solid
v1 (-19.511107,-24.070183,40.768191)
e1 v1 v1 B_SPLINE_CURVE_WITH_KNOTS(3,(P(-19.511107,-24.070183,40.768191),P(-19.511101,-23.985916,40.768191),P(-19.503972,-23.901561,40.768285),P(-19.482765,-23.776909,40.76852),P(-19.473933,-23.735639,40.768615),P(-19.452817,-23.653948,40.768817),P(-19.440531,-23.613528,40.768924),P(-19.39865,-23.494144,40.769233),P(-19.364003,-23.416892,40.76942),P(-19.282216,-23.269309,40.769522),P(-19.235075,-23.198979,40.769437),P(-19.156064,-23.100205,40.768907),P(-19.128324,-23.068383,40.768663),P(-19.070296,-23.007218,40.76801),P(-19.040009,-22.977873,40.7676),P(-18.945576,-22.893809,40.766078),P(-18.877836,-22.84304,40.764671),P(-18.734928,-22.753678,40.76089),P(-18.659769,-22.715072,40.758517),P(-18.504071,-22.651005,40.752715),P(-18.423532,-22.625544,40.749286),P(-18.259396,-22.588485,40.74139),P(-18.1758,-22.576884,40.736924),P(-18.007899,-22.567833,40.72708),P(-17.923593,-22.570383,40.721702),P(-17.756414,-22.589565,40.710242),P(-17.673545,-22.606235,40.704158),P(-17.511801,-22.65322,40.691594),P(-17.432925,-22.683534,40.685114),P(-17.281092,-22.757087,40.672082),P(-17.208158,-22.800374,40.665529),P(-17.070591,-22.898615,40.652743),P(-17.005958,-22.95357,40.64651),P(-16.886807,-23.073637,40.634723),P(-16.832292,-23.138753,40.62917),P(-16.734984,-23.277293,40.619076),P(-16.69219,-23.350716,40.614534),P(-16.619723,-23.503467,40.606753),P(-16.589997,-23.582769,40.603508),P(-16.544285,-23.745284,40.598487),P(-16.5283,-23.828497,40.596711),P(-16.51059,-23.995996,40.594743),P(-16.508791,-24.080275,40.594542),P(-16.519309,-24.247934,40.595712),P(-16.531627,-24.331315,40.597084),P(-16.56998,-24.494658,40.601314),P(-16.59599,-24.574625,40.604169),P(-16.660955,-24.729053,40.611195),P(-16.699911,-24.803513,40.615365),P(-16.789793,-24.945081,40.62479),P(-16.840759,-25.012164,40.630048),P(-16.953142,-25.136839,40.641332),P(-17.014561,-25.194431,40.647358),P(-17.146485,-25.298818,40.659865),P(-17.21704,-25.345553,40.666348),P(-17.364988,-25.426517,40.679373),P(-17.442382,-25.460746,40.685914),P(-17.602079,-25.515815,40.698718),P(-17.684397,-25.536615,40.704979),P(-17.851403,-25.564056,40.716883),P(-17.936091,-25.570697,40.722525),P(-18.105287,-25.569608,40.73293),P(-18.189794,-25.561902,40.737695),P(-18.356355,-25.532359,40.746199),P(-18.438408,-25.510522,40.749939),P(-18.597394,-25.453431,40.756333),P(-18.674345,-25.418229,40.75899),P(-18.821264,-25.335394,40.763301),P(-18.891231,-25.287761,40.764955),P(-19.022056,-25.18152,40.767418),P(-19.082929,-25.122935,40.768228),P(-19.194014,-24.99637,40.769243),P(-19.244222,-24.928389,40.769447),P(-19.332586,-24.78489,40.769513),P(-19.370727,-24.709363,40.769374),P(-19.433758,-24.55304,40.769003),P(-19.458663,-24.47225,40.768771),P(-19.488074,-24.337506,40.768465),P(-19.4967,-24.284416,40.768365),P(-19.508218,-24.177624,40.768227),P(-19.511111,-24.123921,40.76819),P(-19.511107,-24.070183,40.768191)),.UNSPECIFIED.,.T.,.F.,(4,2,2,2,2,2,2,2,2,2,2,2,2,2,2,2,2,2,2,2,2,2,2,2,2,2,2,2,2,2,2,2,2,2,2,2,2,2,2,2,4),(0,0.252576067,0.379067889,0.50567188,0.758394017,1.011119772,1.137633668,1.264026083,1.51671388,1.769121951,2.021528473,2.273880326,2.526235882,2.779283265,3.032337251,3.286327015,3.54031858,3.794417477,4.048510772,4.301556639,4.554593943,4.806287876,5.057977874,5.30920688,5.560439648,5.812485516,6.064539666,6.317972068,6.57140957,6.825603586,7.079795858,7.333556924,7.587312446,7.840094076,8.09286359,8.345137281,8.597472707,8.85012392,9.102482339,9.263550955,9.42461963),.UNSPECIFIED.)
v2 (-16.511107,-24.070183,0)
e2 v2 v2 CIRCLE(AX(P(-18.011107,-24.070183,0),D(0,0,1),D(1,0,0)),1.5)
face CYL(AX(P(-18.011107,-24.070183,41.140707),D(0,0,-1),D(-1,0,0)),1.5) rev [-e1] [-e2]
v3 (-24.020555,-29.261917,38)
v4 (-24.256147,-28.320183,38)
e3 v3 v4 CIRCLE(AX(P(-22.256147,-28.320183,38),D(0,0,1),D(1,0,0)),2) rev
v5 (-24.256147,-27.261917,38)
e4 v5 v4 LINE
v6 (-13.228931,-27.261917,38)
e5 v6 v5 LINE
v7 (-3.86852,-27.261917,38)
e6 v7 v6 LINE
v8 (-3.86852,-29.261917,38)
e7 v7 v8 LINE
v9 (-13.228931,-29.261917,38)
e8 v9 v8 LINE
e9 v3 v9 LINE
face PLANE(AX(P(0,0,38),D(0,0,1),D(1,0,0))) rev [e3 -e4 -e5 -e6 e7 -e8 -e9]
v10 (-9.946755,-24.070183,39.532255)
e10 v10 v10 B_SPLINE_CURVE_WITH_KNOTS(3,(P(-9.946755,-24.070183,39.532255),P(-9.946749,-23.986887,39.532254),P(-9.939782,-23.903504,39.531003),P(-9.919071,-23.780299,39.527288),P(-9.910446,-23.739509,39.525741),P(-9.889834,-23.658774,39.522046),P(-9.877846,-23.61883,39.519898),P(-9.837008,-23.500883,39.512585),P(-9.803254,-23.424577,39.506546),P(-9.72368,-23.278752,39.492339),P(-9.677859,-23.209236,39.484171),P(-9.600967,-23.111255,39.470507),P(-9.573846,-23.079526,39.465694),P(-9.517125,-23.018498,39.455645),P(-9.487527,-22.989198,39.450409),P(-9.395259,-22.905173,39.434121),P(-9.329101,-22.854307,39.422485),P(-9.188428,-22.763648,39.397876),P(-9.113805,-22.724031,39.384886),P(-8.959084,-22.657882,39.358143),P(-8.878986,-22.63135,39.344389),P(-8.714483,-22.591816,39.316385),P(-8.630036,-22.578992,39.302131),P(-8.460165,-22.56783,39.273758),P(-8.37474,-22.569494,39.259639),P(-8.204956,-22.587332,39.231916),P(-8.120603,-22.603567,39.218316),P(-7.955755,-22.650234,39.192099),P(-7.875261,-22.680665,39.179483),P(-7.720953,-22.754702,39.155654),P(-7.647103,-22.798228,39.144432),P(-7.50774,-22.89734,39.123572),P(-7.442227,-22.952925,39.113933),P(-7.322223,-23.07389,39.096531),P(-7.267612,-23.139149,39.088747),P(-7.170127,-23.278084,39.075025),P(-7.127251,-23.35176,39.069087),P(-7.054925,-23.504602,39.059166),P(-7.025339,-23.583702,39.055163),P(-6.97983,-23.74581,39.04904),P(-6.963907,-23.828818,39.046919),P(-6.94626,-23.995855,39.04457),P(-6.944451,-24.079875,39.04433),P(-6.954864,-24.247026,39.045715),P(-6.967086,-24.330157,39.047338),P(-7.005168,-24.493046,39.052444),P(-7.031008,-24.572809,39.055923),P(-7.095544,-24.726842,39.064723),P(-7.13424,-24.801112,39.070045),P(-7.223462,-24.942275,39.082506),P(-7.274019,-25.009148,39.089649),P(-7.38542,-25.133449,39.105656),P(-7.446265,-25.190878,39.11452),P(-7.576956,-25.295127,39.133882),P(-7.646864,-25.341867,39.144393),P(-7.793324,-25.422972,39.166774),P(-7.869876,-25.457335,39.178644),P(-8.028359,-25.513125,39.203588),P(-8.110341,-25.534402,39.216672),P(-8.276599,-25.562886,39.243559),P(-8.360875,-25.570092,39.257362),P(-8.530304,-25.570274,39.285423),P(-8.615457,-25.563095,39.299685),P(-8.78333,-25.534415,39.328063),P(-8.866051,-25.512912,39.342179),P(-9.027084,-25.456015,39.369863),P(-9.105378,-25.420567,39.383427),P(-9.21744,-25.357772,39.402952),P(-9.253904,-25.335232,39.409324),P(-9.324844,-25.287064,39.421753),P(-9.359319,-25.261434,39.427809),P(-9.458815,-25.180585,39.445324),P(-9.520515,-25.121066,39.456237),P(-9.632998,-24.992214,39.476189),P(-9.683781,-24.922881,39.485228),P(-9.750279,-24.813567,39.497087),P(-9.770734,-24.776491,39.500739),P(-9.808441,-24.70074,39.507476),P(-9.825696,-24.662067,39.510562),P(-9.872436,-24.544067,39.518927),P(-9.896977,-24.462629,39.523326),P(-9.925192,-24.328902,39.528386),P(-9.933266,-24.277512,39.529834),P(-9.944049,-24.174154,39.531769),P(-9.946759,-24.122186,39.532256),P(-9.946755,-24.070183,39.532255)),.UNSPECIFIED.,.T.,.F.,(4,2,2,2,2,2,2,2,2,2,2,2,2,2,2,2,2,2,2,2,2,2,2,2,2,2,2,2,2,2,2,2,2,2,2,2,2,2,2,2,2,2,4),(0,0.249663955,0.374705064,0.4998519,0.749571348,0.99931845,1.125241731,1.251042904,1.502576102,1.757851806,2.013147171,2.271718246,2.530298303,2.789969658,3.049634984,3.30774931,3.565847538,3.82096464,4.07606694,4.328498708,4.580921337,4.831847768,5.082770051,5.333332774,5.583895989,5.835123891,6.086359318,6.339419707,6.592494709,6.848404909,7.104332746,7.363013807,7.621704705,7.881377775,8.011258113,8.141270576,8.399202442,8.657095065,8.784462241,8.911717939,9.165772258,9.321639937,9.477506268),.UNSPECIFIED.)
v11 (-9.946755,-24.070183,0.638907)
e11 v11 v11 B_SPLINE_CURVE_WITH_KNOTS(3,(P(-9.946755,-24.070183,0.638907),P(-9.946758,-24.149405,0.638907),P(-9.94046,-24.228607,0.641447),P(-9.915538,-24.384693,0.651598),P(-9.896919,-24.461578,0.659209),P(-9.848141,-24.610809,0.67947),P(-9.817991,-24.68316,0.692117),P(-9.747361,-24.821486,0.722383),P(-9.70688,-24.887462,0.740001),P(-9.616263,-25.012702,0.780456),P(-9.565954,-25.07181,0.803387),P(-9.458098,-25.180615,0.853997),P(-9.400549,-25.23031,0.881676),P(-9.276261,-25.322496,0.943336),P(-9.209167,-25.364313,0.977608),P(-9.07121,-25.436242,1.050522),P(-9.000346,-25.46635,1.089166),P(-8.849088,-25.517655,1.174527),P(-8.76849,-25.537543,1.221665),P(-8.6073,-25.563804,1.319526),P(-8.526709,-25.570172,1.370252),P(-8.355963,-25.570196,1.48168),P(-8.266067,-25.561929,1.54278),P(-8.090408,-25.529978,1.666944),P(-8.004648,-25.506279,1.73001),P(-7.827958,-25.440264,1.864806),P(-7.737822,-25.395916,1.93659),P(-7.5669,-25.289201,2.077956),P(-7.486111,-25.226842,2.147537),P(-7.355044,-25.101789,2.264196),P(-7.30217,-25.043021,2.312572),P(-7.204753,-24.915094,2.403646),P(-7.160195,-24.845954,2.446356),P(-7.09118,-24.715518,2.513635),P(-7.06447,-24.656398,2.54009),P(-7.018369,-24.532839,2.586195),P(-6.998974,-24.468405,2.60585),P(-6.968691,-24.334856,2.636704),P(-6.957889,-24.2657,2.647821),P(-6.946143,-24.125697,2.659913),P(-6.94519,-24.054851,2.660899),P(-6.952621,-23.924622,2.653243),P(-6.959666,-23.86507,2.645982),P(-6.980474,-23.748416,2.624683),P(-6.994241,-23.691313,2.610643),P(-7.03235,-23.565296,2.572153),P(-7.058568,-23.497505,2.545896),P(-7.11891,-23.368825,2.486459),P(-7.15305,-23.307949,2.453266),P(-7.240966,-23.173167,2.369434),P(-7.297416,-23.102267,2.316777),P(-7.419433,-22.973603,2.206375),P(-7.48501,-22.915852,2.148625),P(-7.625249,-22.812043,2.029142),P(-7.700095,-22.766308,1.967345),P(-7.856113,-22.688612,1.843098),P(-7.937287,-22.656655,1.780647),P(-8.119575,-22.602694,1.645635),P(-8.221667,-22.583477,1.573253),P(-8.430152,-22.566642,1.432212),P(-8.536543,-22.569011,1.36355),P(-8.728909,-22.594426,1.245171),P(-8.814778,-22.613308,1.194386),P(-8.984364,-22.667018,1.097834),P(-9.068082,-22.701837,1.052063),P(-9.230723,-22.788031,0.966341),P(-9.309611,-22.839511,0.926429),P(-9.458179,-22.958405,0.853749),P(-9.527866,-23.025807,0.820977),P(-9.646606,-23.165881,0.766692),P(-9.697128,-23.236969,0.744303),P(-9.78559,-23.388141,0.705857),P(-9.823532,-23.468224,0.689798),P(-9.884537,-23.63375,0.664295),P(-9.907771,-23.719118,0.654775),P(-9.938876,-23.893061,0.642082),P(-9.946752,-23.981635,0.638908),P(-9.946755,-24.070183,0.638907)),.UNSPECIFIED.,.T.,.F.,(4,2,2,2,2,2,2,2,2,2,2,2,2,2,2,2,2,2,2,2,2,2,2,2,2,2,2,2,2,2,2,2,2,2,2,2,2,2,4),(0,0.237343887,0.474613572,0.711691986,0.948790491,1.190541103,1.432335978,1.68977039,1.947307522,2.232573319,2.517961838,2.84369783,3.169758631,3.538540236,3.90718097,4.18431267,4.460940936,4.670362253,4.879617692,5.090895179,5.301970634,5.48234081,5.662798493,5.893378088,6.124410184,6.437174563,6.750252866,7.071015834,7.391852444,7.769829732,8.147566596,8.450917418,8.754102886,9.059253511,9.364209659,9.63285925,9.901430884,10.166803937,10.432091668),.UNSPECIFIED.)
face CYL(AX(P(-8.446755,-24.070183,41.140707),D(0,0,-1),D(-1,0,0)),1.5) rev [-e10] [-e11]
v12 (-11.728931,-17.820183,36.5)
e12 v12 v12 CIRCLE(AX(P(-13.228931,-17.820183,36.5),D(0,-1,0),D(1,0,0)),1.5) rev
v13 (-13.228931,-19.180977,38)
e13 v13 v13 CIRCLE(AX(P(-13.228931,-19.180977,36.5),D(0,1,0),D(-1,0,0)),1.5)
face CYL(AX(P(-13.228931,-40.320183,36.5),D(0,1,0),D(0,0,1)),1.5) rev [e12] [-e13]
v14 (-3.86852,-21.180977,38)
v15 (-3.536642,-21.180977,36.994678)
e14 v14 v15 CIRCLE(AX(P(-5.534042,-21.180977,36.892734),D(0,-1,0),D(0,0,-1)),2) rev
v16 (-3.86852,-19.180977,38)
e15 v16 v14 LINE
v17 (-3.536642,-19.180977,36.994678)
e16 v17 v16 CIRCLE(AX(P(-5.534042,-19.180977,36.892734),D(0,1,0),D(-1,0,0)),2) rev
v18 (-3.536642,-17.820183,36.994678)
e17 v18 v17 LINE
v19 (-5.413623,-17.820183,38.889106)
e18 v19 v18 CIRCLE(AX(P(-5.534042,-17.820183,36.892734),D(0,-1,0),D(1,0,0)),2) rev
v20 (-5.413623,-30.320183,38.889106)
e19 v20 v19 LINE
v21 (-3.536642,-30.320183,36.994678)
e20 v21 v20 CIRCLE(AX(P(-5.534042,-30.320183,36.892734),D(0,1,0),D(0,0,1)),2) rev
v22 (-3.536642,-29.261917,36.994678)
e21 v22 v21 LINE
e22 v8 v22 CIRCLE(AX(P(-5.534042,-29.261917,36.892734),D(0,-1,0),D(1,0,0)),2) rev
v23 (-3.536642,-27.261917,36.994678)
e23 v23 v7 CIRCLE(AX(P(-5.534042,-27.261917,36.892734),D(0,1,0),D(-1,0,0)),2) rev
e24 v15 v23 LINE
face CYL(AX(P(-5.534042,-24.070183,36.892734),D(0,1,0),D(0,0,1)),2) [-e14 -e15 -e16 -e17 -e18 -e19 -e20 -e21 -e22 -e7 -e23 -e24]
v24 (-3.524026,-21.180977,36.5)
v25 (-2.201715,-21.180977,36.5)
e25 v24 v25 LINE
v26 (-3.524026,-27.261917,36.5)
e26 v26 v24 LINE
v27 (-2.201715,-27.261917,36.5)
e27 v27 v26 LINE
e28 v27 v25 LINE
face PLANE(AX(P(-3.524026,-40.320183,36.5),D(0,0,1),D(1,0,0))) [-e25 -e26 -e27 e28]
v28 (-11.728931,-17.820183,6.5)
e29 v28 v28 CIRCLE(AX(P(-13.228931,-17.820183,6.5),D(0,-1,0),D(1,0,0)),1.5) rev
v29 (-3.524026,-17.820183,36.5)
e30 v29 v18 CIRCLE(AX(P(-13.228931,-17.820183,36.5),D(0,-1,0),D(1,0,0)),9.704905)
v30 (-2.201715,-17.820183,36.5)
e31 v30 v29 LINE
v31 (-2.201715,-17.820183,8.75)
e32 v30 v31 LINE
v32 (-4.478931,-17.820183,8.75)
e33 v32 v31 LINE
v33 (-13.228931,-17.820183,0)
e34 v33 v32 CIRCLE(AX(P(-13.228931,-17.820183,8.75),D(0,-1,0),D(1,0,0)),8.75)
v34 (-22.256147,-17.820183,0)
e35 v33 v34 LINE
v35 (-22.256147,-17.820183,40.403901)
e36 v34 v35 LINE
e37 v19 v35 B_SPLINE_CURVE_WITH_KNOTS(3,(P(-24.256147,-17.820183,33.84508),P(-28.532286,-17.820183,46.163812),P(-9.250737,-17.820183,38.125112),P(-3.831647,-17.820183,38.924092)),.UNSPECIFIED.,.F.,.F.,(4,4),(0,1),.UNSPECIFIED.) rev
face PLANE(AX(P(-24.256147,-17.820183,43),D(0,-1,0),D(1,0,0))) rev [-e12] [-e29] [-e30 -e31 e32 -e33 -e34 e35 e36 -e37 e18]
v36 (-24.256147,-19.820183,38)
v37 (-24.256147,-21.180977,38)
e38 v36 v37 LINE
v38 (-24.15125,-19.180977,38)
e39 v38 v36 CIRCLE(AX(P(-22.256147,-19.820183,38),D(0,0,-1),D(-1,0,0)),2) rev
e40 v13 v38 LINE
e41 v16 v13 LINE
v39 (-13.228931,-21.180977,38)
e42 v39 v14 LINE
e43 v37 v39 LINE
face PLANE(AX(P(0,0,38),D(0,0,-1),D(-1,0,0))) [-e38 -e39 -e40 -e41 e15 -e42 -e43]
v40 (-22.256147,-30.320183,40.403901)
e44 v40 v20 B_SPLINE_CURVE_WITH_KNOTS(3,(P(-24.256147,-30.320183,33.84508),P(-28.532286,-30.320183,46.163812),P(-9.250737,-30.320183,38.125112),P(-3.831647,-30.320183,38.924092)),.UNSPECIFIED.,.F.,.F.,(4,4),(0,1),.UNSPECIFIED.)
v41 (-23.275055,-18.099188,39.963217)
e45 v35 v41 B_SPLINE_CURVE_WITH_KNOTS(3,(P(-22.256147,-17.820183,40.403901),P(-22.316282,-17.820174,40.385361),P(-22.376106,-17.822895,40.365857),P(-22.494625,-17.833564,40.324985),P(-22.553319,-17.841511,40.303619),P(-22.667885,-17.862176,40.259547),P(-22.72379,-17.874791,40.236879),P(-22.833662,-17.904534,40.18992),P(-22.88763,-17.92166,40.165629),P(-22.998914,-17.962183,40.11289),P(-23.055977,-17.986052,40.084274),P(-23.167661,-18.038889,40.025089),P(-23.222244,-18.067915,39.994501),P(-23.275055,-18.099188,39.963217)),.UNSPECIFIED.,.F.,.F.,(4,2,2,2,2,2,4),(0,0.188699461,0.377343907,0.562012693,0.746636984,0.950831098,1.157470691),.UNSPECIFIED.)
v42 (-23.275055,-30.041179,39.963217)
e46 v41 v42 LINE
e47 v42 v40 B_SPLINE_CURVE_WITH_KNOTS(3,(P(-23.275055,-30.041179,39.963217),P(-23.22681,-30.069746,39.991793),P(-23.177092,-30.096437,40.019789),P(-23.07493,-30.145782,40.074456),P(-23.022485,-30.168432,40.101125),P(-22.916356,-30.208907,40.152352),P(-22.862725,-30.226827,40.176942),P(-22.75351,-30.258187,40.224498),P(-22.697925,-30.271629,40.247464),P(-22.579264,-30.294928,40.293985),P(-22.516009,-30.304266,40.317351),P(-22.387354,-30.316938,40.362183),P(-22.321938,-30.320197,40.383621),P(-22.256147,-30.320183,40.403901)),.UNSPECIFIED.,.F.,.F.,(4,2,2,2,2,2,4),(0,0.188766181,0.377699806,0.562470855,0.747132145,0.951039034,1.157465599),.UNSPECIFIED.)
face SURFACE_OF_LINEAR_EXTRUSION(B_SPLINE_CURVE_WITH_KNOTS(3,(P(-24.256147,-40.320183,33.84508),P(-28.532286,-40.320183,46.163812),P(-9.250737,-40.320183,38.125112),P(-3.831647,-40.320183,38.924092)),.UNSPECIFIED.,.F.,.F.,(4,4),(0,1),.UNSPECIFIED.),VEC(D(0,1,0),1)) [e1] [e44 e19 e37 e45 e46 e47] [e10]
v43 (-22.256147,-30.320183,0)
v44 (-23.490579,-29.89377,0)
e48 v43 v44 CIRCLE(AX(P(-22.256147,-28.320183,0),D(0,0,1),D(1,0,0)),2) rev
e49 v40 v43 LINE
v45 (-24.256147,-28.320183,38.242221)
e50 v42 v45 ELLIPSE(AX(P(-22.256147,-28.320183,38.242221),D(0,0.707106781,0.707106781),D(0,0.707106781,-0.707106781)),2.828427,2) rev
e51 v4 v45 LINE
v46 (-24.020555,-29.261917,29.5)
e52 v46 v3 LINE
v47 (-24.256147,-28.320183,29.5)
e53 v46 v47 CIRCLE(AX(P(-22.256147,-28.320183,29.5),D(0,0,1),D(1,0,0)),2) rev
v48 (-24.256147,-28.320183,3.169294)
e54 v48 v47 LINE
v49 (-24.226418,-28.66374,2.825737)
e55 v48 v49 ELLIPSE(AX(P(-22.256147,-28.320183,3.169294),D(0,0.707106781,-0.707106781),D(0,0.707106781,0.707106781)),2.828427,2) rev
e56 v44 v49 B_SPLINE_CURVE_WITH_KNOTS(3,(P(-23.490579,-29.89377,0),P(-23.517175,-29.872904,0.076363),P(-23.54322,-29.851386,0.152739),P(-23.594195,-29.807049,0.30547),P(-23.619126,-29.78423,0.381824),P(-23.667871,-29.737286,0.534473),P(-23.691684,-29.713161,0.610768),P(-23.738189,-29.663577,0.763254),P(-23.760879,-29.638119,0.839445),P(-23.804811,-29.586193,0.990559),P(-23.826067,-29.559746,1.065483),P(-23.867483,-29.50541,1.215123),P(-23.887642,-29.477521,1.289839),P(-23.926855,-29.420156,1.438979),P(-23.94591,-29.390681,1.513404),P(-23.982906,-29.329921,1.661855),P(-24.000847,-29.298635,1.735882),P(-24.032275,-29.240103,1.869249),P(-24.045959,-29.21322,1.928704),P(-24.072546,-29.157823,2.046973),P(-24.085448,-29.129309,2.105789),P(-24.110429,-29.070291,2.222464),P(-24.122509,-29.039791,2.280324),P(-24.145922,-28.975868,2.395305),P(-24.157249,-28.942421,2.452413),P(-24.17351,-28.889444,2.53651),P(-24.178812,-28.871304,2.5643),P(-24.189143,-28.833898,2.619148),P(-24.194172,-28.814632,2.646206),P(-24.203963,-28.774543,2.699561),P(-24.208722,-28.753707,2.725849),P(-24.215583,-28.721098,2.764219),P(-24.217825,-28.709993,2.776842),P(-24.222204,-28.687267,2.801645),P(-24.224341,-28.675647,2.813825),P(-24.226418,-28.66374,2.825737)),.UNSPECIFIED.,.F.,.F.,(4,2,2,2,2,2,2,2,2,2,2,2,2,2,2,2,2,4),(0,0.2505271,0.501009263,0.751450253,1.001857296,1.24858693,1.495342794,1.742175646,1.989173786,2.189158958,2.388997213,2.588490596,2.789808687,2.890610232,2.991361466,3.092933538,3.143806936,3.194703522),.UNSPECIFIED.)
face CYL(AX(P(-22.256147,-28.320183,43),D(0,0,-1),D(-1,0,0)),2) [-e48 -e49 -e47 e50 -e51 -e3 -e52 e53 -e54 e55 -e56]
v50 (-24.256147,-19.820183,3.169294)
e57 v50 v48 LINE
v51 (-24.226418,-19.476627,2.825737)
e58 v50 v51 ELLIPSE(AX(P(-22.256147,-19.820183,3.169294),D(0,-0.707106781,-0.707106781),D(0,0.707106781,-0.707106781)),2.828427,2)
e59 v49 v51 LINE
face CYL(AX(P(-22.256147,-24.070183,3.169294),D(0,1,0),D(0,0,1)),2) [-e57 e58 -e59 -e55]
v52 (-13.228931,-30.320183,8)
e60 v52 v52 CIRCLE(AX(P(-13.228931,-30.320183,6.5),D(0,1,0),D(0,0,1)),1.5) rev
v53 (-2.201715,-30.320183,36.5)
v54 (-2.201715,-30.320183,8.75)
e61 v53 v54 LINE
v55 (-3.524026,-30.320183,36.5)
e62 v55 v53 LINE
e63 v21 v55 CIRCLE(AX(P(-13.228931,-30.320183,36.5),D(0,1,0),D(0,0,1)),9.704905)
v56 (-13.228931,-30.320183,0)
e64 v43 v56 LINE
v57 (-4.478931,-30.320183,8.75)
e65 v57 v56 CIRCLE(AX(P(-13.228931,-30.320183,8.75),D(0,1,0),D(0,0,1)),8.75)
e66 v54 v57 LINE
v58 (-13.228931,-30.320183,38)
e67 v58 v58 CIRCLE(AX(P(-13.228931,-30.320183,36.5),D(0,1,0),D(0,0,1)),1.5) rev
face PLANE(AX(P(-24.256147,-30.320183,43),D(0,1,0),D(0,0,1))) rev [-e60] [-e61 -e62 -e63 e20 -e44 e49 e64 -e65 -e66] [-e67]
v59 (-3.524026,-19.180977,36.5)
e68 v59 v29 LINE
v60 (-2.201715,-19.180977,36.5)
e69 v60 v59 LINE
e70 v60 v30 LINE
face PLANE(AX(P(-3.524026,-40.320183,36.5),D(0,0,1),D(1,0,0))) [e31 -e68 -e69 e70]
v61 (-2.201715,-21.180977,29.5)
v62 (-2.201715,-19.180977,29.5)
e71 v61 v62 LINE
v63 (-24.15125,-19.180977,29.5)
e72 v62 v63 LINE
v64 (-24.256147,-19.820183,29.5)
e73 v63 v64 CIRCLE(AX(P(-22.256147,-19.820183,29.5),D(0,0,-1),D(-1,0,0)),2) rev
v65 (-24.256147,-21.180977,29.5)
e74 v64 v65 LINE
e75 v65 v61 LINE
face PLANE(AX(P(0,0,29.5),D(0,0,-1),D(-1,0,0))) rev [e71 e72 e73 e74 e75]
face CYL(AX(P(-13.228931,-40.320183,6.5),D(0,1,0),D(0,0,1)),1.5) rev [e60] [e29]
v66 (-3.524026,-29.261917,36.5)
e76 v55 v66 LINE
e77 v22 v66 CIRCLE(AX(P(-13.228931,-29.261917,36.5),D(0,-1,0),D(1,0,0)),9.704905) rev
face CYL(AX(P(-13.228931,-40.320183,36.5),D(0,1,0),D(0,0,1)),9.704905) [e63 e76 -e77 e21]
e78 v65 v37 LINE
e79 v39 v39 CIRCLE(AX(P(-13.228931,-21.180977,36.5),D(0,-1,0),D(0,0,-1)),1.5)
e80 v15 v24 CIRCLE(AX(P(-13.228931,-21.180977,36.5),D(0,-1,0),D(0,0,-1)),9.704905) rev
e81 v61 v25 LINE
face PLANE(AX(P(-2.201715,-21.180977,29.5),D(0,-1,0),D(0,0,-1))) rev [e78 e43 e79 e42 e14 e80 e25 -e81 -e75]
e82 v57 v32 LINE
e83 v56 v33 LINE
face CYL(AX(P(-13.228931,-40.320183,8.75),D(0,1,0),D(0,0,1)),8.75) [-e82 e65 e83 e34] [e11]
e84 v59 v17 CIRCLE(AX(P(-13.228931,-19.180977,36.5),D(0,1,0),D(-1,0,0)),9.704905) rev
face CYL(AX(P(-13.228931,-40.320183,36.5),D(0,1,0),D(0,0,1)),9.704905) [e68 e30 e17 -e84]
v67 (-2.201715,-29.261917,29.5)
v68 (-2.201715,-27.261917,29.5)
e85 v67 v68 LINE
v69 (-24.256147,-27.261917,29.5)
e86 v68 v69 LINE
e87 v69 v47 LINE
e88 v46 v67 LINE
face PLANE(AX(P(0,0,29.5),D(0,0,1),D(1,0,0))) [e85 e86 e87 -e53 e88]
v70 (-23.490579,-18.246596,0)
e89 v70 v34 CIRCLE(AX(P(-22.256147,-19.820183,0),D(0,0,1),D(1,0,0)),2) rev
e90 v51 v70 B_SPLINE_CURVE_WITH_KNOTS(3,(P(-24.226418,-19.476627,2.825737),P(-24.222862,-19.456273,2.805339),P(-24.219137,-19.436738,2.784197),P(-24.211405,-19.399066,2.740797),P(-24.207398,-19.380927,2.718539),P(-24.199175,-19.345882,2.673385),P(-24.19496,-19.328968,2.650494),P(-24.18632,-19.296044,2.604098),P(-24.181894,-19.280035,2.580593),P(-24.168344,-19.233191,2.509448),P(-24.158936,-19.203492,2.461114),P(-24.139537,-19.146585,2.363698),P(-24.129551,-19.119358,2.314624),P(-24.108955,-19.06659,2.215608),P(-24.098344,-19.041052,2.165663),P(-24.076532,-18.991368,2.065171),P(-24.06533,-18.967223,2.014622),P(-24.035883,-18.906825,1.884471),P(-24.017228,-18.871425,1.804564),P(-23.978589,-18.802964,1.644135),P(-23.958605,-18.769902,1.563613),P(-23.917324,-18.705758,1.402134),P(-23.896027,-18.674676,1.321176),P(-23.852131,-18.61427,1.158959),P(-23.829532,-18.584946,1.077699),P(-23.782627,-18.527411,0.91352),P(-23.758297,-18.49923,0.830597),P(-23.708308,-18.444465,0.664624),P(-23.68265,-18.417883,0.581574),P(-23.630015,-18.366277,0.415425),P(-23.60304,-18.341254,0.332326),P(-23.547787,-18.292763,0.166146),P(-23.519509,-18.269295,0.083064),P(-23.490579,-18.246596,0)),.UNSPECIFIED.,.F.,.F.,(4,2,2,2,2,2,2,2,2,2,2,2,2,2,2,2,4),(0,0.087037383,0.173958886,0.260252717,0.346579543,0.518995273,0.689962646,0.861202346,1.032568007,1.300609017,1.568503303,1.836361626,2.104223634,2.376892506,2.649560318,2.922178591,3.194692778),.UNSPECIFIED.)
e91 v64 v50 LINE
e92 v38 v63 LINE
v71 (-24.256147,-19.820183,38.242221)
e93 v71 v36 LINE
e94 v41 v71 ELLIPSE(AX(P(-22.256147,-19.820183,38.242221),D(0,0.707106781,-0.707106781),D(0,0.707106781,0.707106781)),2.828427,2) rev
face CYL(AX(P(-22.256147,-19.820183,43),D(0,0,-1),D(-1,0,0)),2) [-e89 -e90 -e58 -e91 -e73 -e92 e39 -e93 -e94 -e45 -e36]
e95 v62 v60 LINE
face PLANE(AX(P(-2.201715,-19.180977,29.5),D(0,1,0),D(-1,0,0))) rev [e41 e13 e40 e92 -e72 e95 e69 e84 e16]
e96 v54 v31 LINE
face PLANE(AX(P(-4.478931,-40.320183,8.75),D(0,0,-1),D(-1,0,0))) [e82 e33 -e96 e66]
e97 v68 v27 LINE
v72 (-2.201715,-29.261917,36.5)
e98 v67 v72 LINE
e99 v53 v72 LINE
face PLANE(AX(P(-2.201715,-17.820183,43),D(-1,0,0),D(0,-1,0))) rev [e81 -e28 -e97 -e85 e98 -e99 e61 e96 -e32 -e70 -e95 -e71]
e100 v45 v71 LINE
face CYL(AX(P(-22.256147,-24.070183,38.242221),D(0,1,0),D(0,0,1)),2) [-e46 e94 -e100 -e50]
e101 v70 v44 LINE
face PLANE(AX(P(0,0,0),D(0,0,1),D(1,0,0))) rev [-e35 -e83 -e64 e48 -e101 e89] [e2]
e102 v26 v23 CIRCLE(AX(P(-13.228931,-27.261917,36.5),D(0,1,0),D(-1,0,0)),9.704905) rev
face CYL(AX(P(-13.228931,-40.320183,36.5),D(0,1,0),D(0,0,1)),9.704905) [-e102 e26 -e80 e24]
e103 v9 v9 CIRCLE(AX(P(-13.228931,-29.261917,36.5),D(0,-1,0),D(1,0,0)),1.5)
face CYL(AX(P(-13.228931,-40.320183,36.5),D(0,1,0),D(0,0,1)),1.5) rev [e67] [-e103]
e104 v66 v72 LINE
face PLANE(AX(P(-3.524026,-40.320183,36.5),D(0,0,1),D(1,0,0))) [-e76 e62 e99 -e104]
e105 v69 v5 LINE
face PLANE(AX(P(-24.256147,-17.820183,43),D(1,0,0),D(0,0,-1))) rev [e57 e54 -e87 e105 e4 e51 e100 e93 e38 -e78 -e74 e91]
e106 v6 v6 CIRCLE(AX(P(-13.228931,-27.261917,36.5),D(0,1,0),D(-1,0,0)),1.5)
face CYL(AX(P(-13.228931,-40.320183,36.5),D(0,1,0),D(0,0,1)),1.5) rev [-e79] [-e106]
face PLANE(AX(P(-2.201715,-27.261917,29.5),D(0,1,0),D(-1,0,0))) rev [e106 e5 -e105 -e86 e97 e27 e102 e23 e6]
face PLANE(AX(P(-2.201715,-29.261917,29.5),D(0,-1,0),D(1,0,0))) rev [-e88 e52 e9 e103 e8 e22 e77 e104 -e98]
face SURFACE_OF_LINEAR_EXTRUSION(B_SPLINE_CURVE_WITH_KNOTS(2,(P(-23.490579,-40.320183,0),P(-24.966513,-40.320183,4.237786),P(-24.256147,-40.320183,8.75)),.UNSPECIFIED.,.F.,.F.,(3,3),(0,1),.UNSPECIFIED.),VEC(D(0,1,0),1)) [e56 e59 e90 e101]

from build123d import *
from OCP.BRepAlgoAPI import BRepAlgoAPI_Cut
from OCP.TopTools import TopTools_ListOfShape

# Parameters (mm, degrees)
SKETCH1_W               = 22.054431489
SKETCH1_H               = 12.5
BOSS_EXTRUDE1_DEPTH     = 43
CUT_EXTRUDE1_DEPTH      = 10
CUT_EXTRUDE1_DEPTH_BACK = 15
SKETCH2_R               = 1.5
FILLET3_START           = -1
FILLET3_DEPTH           = 42
FILLET3_START_2         = -31
FILLET3_2_DEPTH         = 14
SKETCH5_R               = 1.5
CUT_EXTRUDE4_DEPTH      = 57.301199739
SKETCH16_W              = 22.05443149
SKETCH16_H              = 2
CUT_EXTRUDE6_DEPTH      = 8.5
FILLET4_START           = -31
FILLET4_DEPTH           = 14


with BuildPart() as part:
    # Sketch1 → Boss-Extrude1 (new body)
    with BuildSketch(Plane.XY):
        with Locations((-13.228930986, -24.070183414)):
            Rectangle(SKETCH1_W, SKETCH1_H)
    extrude(amount=BOSS_EXTRUDE1_DEPTH)

    # Sketch2 → Cut-Extrude1 (cut, two sides: drawn at the far end of the back side and taken through both)
    with BuildSketch(Plane.XZ.offset(30.320183414).offset(-CUT_EXTRUDE1_DEPTH_BACK)):
        with Locations(Location((-13.228930986, 6.5, 0), (0, 0, 90))):
            Circle(SKETCH2_R)
        with Locations(Location((-13.228930986, 36.5, 0), (0, 0, 90))):
            Circle(SKETCH2_R)
        with BuildLine():
            Line((-3.524026068, 36.5), (-2.201715242, 36.5))
            add(Edge.make_bspline(
                [(-24.256146731, 33.845079723), (-30.410867424, 43.557524996), (-12.605557553, 54.855746483), (11.277296074, 42.57460591), (-2.201715242, 36.5)],
                knots=[0, 0, 0, 0, 0.503104745, 1, 1, 1, 1], degree=3))
            add(Edge.make_bspline(
                [(-3.83164653, 38.924092472), (-9.250736817, 38.125111697), (-28.532285754, 46.163812106), (-24.256146731, 33.845079723)],
                knots=[0, 0, 0, 0, 1, 1, 1, 1], degree=3))
            ThreePointArc((-3.83164653, 38.924092472), (-3.601238334, 37.721766617), (-3.524026068, 36.5))
        make_face()
        with BuildLine():
            Line((-4.478930986, 8.75), (-2.201715242, 8.75))
            add(Edge.make_bspline(
                [(-2.201715242, 8.75), (5.39210746, 3.880294823), (-0.777052631, -4.523329032), (-17.174300591, -10.623347238), (-34.821400648, -0.026005424), (-24.256146731, 8.75)],
                knots=[0, 0, 0, 0, 0.283272691, 0.504244858, 1, 1, 1, 1], degree=3))
            add(Edge.make_bspline(
                [(-23.490579314, 0), (-24.966512963, 4.237786421), (-24.256146731, 8.75)],
                knots=[0, 0, 0, 1, 1, 1], degree=2))
            Line((-23.490579314, 0), (-13.228930986, 0))
            ThreePointArc((-13.228930986, 0), (-7.041746651, 2.562815665), (-4.478930986, 8.75))
        make_face()
    extrude(amount=CUT_EXTRUDE1_DEPTH + CUT_EXTRUDE1_DEPTH_BACK, mode=Mode.SUBTRACT)


with BuildPart() as fillet3_tool:
    # Fillet3: read off the stored shape, not the designer's step
    # Fillet3 outline → Fillet3 (new body)
    with BuildSketch(Plane.XY.offset(FILLET3_START)):
        with BuildLine():
            Line((-24.256146731, -17.820183414), (-24.256146731, -19.820183414))
            ThreePointArc((-24.256146731, -19.820183414), (-23.670360293, -18.405969851), (-22.256146731, -17.820183414))
            Line((-22.256146731, -17.820183414), (-24.256146731, -17.820183414))
        make_face()
        with BuildLine():
            ThreePointArc((-22.256146731, -30.320183414), (-23.670360293, -29.734396976), (-24.256146731, -28.320183414))
            Line((-24.256146731, -28.320183414), (-24.256146731, -30.320183414))
            Line((-24.256146731, -30.320183414), (-22.256146731, -30.320183414))
        make_face()
    extrude(amount=FILLET3_DEPTH)


with BuildPart() as part_1:
    add(part.part)

    # Fillet3: cut by fillet3_tool, with a tolerance
    fillet3_stock = TopTools_ListOfShape()
    fillet3_stock.Append(part_1.part.wrapped)
    fillet3_tools = TopTools_ListOfShape()
    fillet3_tools.Append(fillet3_tool.part.wrapped)
    fillet3_cut = BRepAlgoAPI_Cut()
    fillet3_cut.SetArguments(fillet3_stock)
    fillet3_cut.SetTools(fillet3_tools)
    fillet3_cut.SetFuzzyValue(0.00001)
    fillet3_cut.Build()
    add(Compound.cast(fillet3_cut.Shape()).solids(), mode=Mode.REPLACE)


with BuildPart() as fillet3_2_tool:
    # Fillet3 2 outline → Fillet3 2 (new body)
    with BuildSketch(Plane(origin=(0, 0, 0), x_dir=(1, 0, 0), z_dir=(0, 1, 0)).offset(FILLET3_START_2)):
        with BuildLine():
            Line((-24.256146731, -3.001504812), (-24.256146731, -3.16929397))
            ThreePointArc((-24.256146731, -3.16929397), (-24.248700679, -2.996873655), (-24.226417966, -2.82573719))
            add(Edge.make_bspline(
                [(-24.226417966, -2.82573719), (-24.241732441, -2.913564505), (-24.256146731, -3.001504812)],
                knots=[0.329874436, 0.329874436, 0.329874436, 0.350165787, 0.350165787, 0.350165787], degree=2))
        make_face()
        with BuildLine():
            ThreePointArc((-23.275055203, -39.963216674), (-23.99364737, -39.232721814), (-24.256146731, -38.242221169))
            Line((-24.256146731, -38.242221169), (-24.256146731, -39.081457115))
            add(Edge.make_bspline(
                [(-24.256146731, -39.081457115), (-23.999461699, -39.439477902), (-23.668462552, -39.730301433), (-23.275055203, -39.963216674)],
                knots=[0.20342968, 0.20342968, 0.20342968, 0.20342968, 0.271697972, 0.271697972, 0.271697972, 0.271697972], degree=3))
        make_face()
    extrude(amount=FILLET3_2_DEPTH)


with BuildPart() as part_2:
    add(part_1.part)

    # Fillet3 2: cut by fillet3_2_tool, with a tolerance
    fillet3_2_stock = TopTools_ListOfShape()
    fillet3_2_stock.Append(part_2.part.wrapped)
    fillet3_2_tools = TopTools_ListOfShape()
    fillet3_2_tools.Append(fillet3_2_tool.part.wrapped)
    fillet3_2_cut = BRepAlgoAPI_Cut()
    fillet3_2_cut.SetArguments(fillet3_2_stock)
    fillet3_2_cut.SetTools(fillet3_2_tools)
    fillet3_2_cut.SetFuzzyValue(0.00001)
    fillet3_2_cut.Build()
    add(Compound.cast(fillet3_2_cut.Shape()).solids(), mode=Mode.REPLACE)

    # Sketch5 → Cut-Extrude4 (cut, through all)
    with BuildSketch(Plane.XY):
        with Locations(Location((-18.011106811, -24.070183414, 0), (0, 0, 180))):
            Circle(SKETCH5_R)
        with Locations(Location((-8.446755162, -24.070183414, 0), (0, 0, 180))):
            Circle(SKETCH5_R)
    extrude(amount=CUT_EXTRUDE4_DEPTH, mode=Mode.SUBTRACT)

    # Sketch16 → Cut-Extrude6 (cut)
    with BuildSketch(Plane.XY.offset(38)):
        with Locations((-13.228930985, -20.1809771)):
            Rectangle(SKETCH16_W, SKETCH16_H)
        with Locations((-13.228930985, -28.261916897)):
            Rectangle(SKETCH16_W, SKETCH16_H)
    extrude(amount=-CUT_EXTRUDE6_DEPTH, mode=Mode.SUBTRACT)

    # Fillet4: read off the stored shape, not the designer's step
    # Fillet4 outline → Fillet4 (cut)
    with BuildSketch(Plane(origin=(0, 0, 0), x_dir=(1, 0, 0), z_dir=(0, 1, 0)).offset(FILLET4_START)):
        with BuildLine():
            ThreePointArc((-3.536641618, -36.994677952), (-4.113301238, -38.300390358), (-5.413622589, -38.88910556))
            add(Edge.make_bspline(
                [(-5.413622589, -38.88910556), (-4.807642485, -38.852553426), (-4.273553237, -38.858938555), (-3.83164653, -38.924092472)],
                knots=[0.91845371, 0.91845371, 0.91845371, 0.91845371, 1, 1, 1, 1], degree=3))
            ThreePointArc((-3.83164653, -38.924092472), (-3.635515677, -37.966820429), (-3.536641618, -36.994677952))
        make_face()
    extrude(amount=FILLET4_DEPTH, mode=Mode.SUBTRACT)


solid = part_2.part
